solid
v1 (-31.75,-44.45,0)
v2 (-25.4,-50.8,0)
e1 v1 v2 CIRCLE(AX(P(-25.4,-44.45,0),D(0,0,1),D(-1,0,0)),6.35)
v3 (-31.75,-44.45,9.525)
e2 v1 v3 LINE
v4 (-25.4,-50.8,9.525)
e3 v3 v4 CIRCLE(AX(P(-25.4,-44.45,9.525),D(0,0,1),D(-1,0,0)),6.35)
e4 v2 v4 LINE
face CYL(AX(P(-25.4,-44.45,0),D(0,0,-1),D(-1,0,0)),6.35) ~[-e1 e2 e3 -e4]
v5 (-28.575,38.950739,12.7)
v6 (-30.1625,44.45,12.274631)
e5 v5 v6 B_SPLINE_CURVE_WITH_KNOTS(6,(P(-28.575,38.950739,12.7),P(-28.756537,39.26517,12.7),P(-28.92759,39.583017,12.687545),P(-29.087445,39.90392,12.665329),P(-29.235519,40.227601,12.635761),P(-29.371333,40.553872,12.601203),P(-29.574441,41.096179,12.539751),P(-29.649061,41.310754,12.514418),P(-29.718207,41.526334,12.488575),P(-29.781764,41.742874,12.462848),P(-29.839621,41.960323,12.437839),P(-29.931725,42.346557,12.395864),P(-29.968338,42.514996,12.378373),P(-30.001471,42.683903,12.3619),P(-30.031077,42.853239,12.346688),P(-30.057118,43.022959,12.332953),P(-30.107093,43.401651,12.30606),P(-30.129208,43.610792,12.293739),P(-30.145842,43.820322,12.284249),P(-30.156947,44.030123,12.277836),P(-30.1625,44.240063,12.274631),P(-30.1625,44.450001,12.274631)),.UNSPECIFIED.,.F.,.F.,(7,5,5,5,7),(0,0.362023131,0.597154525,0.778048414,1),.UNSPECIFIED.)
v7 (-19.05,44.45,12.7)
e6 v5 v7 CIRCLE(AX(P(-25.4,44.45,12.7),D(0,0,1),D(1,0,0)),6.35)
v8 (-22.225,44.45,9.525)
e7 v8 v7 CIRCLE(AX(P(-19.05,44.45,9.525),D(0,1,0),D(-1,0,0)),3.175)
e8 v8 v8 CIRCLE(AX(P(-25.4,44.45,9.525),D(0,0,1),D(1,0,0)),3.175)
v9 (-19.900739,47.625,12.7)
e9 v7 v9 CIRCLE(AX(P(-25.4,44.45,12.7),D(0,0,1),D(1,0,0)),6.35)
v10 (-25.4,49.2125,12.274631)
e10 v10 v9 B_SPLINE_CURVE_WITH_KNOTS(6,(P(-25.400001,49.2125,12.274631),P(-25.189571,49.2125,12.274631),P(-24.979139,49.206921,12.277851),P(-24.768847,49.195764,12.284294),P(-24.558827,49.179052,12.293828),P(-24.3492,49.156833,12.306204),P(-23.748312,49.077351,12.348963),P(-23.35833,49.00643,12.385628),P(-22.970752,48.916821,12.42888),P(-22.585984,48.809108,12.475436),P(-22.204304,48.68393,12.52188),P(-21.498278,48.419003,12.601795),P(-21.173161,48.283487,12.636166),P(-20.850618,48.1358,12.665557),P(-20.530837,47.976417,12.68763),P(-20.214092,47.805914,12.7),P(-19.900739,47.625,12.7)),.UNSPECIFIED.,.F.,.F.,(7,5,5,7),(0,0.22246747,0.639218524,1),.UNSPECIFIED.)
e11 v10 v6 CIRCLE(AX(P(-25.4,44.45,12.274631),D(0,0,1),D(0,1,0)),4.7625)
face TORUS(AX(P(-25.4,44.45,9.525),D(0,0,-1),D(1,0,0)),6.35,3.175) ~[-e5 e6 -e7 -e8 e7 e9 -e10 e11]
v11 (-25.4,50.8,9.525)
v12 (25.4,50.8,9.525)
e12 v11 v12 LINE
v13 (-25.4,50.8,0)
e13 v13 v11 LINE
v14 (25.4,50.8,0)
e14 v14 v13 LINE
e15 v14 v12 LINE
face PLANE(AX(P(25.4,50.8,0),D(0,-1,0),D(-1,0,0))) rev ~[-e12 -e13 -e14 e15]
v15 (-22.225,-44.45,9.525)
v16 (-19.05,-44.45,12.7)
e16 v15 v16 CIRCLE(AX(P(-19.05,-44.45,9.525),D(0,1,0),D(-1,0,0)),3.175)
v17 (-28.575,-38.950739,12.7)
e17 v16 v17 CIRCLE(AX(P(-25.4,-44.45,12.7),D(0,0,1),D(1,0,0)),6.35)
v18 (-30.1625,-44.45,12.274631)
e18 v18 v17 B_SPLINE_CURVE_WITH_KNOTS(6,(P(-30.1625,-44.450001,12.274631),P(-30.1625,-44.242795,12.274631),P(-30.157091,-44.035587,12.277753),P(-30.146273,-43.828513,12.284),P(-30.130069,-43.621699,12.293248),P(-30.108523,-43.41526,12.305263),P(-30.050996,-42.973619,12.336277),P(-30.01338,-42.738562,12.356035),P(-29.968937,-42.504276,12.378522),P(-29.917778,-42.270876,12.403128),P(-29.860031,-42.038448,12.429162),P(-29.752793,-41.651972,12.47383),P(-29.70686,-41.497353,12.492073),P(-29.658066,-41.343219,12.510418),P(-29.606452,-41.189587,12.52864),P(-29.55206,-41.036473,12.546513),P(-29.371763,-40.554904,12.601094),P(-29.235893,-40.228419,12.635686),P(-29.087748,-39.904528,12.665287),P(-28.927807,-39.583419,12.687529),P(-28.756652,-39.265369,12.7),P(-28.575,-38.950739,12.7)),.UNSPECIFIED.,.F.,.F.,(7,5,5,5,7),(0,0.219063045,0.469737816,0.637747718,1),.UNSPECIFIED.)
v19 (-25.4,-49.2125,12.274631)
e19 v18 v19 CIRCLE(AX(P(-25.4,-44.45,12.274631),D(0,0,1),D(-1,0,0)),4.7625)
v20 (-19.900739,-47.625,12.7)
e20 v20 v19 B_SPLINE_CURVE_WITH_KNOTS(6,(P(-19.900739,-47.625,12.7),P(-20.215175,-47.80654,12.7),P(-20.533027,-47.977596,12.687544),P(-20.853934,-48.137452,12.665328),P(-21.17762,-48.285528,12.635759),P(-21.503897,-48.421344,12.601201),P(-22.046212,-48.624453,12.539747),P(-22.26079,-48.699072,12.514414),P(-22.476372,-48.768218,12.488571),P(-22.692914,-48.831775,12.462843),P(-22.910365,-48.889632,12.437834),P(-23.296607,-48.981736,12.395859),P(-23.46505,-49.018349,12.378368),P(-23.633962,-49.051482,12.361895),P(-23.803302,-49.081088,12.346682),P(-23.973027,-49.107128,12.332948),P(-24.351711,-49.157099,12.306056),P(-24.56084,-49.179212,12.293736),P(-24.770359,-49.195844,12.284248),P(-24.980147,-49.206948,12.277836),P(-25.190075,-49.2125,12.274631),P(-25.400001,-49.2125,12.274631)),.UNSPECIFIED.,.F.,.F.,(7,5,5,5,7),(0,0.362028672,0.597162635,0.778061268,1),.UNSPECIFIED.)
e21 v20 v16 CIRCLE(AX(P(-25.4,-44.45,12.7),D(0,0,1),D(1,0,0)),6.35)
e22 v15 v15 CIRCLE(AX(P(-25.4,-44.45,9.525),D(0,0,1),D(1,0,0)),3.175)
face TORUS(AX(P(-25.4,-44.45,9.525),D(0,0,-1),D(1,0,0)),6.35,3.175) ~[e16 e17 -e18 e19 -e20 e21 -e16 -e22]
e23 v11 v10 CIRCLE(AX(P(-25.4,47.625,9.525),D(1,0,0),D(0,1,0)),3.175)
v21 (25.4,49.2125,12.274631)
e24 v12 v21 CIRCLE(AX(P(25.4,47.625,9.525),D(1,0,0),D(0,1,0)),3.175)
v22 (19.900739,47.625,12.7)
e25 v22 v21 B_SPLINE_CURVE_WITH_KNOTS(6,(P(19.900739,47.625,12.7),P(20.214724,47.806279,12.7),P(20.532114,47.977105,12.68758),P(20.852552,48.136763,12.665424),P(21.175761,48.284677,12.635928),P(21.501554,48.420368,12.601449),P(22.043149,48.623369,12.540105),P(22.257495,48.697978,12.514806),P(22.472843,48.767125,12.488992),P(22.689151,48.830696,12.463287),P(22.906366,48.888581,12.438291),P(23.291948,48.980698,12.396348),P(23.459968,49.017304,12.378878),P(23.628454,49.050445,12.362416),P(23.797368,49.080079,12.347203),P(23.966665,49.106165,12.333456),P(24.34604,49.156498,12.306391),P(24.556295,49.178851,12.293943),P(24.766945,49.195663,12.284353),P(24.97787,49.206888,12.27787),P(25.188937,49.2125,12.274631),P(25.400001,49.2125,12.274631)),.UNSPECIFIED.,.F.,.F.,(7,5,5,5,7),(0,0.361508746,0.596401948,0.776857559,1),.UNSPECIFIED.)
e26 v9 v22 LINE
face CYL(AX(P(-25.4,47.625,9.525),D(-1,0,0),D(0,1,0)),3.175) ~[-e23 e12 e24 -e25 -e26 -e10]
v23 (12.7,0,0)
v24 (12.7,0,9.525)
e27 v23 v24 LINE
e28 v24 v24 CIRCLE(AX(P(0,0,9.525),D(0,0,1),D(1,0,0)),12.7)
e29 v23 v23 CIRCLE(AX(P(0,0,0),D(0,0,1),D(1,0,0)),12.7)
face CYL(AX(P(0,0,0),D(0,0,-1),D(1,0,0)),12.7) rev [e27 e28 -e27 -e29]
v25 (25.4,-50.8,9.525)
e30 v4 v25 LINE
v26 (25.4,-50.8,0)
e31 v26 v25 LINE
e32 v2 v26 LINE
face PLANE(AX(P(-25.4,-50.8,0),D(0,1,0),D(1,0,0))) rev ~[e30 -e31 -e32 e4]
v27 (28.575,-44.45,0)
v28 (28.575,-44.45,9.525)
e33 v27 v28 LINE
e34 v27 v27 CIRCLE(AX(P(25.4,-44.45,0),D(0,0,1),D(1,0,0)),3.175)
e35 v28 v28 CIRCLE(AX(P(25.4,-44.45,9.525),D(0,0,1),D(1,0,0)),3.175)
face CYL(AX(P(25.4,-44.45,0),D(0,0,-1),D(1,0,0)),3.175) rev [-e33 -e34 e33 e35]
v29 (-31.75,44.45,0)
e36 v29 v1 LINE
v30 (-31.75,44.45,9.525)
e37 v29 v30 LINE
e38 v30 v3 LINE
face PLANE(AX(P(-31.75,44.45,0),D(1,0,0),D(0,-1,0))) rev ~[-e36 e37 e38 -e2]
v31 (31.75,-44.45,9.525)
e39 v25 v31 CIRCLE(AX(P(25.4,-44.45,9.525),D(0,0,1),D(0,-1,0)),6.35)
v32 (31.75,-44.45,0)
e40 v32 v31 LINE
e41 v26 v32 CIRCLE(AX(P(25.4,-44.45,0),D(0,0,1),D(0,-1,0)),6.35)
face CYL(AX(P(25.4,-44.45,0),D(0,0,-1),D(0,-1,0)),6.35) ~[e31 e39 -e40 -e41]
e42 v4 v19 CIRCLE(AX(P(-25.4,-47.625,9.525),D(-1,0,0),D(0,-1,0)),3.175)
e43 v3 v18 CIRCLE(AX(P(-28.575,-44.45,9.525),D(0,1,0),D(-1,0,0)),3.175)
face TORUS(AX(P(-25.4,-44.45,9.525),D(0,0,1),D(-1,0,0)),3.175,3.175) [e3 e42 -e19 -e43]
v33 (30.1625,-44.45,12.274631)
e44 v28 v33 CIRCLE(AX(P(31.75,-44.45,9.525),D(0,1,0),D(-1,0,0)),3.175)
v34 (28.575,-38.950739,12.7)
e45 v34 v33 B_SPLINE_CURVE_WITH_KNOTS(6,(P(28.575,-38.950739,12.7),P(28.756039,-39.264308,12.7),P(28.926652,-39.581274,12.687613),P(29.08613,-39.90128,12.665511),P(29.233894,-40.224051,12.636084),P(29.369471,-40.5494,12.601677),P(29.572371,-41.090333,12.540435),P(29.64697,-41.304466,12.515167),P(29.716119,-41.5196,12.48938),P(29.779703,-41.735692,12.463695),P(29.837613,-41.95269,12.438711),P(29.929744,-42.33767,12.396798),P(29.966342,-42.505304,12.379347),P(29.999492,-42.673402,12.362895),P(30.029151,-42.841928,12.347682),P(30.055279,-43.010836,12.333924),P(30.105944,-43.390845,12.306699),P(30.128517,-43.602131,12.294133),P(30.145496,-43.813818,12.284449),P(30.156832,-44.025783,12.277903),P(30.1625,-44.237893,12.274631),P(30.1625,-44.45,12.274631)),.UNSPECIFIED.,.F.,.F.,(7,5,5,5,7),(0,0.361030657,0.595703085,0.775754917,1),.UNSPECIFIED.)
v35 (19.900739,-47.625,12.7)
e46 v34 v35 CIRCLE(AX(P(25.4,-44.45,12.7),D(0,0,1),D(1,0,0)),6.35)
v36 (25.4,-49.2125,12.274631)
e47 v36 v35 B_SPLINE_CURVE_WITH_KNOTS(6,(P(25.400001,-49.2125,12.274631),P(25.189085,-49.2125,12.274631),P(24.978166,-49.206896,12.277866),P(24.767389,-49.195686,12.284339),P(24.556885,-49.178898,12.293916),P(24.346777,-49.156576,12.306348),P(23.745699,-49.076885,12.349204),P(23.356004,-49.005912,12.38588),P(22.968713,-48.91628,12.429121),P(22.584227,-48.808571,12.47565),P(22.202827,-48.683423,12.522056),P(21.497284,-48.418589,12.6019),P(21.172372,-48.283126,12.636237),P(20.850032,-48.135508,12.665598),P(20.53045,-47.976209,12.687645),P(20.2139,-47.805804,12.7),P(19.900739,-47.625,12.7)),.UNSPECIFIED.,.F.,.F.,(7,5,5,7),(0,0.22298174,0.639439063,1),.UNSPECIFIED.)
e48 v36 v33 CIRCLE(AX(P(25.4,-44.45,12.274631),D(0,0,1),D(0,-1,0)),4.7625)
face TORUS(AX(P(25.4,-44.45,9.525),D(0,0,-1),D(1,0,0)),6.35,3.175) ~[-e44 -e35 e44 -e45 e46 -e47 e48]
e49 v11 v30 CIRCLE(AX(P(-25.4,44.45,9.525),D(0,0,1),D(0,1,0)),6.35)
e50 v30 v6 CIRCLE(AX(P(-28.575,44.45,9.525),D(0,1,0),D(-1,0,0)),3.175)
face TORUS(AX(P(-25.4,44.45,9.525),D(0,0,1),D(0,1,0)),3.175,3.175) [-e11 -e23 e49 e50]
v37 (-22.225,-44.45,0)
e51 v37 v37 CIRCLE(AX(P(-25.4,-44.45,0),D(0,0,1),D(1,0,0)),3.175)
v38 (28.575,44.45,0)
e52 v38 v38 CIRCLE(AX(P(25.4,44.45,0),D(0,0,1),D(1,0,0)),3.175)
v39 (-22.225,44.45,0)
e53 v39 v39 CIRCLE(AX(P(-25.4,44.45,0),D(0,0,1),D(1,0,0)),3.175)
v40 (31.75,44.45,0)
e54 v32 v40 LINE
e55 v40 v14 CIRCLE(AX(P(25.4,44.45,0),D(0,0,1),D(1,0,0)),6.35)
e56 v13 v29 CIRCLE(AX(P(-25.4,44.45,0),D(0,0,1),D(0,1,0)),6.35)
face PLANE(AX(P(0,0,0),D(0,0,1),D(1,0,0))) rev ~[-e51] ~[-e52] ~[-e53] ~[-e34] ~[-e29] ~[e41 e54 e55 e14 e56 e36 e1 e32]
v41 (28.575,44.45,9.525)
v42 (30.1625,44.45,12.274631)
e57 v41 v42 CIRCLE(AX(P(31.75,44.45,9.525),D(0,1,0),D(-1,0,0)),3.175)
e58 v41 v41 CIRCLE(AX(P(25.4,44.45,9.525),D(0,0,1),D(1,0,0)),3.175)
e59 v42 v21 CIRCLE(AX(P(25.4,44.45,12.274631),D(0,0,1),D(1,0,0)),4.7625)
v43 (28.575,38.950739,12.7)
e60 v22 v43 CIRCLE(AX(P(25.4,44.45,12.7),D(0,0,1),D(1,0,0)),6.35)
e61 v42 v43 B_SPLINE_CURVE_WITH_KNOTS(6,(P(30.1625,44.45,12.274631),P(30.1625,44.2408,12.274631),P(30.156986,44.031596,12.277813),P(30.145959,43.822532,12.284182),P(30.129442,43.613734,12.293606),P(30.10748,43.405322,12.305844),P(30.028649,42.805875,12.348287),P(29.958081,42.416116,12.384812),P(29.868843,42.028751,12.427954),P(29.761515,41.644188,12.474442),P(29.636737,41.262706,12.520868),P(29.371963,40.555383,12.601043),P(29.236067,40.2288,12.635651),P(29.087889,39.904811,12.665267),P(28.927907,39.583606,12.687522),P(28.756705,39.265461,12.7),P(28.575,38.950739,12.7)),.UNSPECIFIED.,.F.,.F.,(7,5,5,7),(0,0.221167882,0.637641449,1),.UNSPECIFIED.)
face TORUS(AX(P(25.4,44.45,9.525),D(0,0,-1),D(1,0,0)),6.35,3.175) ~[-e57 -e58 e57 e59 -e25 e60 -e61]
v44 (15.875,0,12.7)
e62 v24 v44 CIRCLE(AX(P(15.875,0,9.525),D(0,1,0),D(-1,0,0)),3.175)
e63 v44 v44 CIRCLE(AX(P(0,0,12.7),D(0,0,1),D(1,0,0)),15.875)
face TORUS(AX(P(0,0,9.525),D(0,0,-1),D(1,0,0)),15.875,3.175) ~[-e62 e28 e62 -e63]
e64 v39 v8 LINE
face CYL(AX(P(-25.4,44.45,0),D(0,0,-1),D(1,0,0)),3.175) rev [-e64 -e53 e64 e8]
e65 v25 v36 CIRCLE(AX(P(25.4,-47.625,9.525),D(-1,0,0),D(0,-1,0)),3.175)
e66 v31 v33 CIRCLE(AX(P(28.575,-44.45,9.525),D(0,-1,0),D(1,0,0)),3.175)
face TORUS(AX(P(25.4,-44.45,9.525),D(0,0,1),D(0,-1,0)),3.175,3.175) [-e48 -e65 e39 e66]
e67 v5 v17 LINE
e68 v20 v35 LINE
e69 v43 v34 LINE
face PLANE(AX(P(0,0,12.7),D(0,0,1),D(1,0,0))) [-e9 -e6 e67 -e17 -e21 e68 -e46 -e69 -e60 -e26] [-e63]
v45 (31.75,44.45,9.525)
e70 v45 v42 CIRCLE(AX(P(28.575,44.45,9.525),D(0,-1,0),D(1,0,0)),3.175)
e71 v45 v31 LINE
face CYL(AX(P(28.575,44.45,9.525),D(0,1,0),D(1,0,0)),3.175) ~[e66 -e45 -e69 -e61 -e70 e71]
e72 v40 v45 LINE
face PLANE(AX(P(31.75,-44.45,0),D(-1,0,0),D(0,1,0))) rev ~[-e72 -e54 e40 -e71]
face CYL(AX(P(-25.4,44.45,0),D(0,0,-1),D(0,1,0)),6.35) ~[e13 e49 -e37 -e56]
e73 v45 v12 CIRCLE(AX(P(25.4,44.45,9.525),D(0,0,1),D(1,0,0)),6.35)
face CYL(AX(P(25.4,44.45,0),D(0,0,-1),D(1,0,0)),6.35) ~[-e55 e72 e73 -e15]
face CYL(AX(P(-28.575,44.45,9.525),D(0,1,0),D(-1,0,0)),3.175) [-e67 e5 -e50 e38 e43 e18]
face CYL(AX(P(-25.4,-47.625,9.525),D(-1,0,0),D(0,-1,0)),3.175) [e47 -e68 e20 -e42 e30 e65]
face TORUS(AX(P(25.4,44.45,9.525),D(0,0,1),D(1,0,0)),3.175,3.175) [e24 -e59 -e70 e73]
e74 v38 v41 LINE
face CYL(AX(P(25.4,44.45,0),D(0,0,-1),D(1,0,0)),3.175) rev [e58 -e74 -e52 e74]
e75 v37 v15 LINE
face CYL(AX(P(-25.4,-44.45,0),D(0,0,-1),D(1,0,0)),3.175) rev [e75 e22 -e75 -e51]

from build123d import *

# Parameters (mm, degrees)
F0_R         = 3.175
F0_R_2       = 12.7
F1_DEPTH     = 12.7
F2_T1_DEPTH  = 50.8
F2_T3_DEPTH  = 88.9
F2_T6_ANGLE  = 90
F2_T8_ANGLE  = 90
F2_T10_ANGLE = 90
F2_T12_ANGLE = 90


# Not quite as in the source:
# - a fillet or chamfer that OpenCascade refuses, or shapes differently, is made with other operations: its cross-section is extruded or revolved along the edge and cut away or added


with BuildPart() as f1:
    # F0 (on Top) → F1 (new body)
    with BuildSketch(Plane.XY):
        with BuildLine():
            ThreePointArc((31.75, 44.45), (29.8901280605, 48.9401280605), (25.4, 50.8))
            Line((25.4, 50.8), (-25.4, 50.8))
            ThreePointArc((-25.4, 50.8), (-29.8901280605, 48.9401280605), (-31.75, 44.45))
            Line((-31.75, 44.45), (-31.75, -44.45))
            ThreePointArc((-31.75, -44.45), (-29.8901280605, -48.9401280605), (-25.4, -50.8))
            Line((-25.4, -50.8), (25.4, -50.8))
            ThreePointArc((25.4, -50.8), (29.8901280605, -48.9401280605), (31.75, -44.45))
            Line((31.75, -44.45), (31.75, 44.45))
        make_face()
        with Locations((-25.4, -44.45)):
            Circle(F0_R, mode=Mode.SUBTRACT)
        with Locations((25.4, -44.45)):
            Circle(F0_R, mode=Mode.SUBTRACT)
        Circle(F0_R_2, mode=Mode.SUBTRACT)
        with Locations((-25.4, 44.45)):
            Circle(F0_R, mode=Mode.SUBTRACT)
        with Locations((25.4, 44.45)):
            Circle(F0_R, mode=Mode.SUBTRACT)
    extrude(amount=F1_DEPTH)

    # F2: fillet of radius 3.175 on 13 edges, made by hand

    # F2_s2 → F2_t1 (cut)
    with BuildSketch(Plane.YZ.offset(-25.4)):
        with BuildLine():
            ThreePointArc((50.8, 9.525), (49.8700640303, 11.7700640303), (47.625, 12.7))
            Line((47.625, 12.7), (50.8, 12.7))
            Line((50.8, 12.7), (50.8, 9.525))
        make_face()
        with BuildLine():
            ThreePointArc((-50.8, 9.525), (-49.8700640303, 11.7700640303), (-47.625, 12.7))
            Line((-47.625, 12.7), (-50.8, 12.7))
            Line((-50.8, 12.7), (-50.8, 9.525))
        make_face()
    extrude(amount=F2_T1_DEPTH, mode=Mode.SUBTRACT)

    # F2_s4 → F2_t3 (cut)
    with BuildSketch(Plane.XZ.offset(-44.45)):
        with BuildLine():
            ThreePointArc((-31.75, 9.525), (-30.8200640303, 11.7700640303), (-28.575, 12.7))
            Line((-28.575, 12.7), (-31.75, 12.7))
            Line((-31.75, 12.7), (-31.75, 9.525))
        make_face()
        with BuildLine():
            ThreePointArc((31.75, 9.525), (30.8200640303, 11.7700640303), (28.575, 12.7))
            Line((28.575, 12.7), (31.75, 12.7))
            Line((31.75, 12.7), (31.75, 9.525))
        make_face()
    extrude(amount=F2_T3_DEPTH, mode=Mode.SUBTRACT)

    # F2_s5 → F2_t6 (revolve, cut)
    with BuildSketch(Plane.XZ.offset(-44.45)):
        with BuildLine():
            ThreePointArc((31.75, 9.525), (30.8200640303, 11.7700640303), (28.575, 12.7))
            Line((28.575, 12.7), (31.75, 12.7))
            Line((31.75, 12.7), (31.75, 9.525))
        make_face()
    revolve(axis=Axis((25.4, 44.45, 12.7), (0, 0, 1)), revolution_arc=F2_T6_ANGLE, mode=Mode.SUBTRACT)

    # F2_s7 → F2_t8 (revolve, cut)
    with BuildSketch(Plane.YZ.offset(-25.4)):
        with BuildLine():
            ThreePointArc((50.8, 9.525), (49.8700640303, 11.7700640303), (47.625, 12.7))
            Line((47.625, 12.7), (50.8, 12.7))
            Line((50.8, 12.7), (50.8, 9.525))
        make_face()
    revolve(axis=Axis((-25.4, 44.45, 12.7), (0, 0, 1)), revolution_arc=F2_T8_ANGLE, mode=Mode.SUBTRACT)

    # F2_s9 → F2_t10 (revolve, cut)
    with BuildSketch(Plane.XZ.offset(44.45)):
        with BuildLine():
            ThreePointArc((-31.75, 9.525), (-30.8200640303, 11.7700640303), (-28.575, 12.7))
            Line((-28.575, 12.7), (-31.75, 12.7))
            Line((-31.75, 12.7), (-31.75, 9.525))
        make_face()
    revolve(axis=Axis((-25.4, -44.45, 12.7), (0, 0, 1)), revolution_arc=F2_T10_ANGLE, mode=Mode.SUBTRACT)

    # F2_s11 → F2_t12 (revolve, cut)
    with BuildSketch(Plane.YZ.offset(25.4)):
        with BuildLine():
            ThreePointArc((-50.8, 9.525), (-49.8700640303, 11.7700640303), (-47.625, 12.7))
            Line((-47.625, 12.7), (-50.8, 12.7))
            Line((-50.8, 12.7), (-50.8, 9.525))
        make_face()
    revolve(axis=Axis((25.4, -44.45, 12.7), (0, 0, 1)), revolution_arc=F2_T12_ANGLE, mode=Mode.SUBTRACT)

    # F2_s13 → F2_t14 (revolve, cut)
    with BuildSketch(Plane.XZ.offset(44.45)):
        with BuildLine():
            ThreePointArc((-22.225, 9.525), (-21.2950640303, 11.7700640303), (-19.05, 12.7))
            Line((-19.05, 12.7), (-22.225, 12.7))
            Line((-22.225, 12.7), (-22.225, 9.525))
        make_face()
    revolve(axis=Axis((-25.4, -44.45, 12.7), (0, 0, 1)), mode=Mode.SUBTRACT)

    # F2_s15 → F2_t16 (revolve, cut)
    with BuildSketch(Plane.XZ.offset(44.45)):
        with BuildLine():
            ThreePointArc((28.575, 9.525), (29.5049359697, 11.7700640303), (31.75, 12.7))
            Line((31.75, 12.7), (28.575, 12.7))
            Line((28.575, 12.7), (28.575, 9.525))
        make_face()
    revolve(axis=Axis((25.4, -44.45, 12.7), (0, 0, 1)), mode=Mode.SUBTRACT)

    # F2_s17 → F2_t18 (revolve, cut)
    with BuildSketch(Plane.XZ):
        with BuildLine():
            ThreePointArc((12.7, 9.525), (13.6299359697, 11.7700640303), (15.875, 12.7))
            Line((15.875, 12.7), (12.7, 12.7))
            Line((12.7, 12.7), (12.7, 9.525))
        make_face()
    revolve(axis=Axis((0, 0, 12.7), (0, 0, 1)), mode=Mode.SUBTRACT)

    # F2_s19 → F2_t20 (revolve, cut)
    with BuildSketch(Plane.XZ.offset(-44.45)):
        with BuildLine():
            ThreePointArc((-22.225, 9.525), (-21.2950640303, 11.7700640303), (-19.05, 12.7))
            Line((-19.05, 12.7), (-22.225, 12.7))
            Line((-22.225, 12.7), (-22.225, 9.525))
        make_face()
    revolve(axis=Axis((-25.4, 44.45, 12.7), (0, 0, 1)), mode=Mode.SUBTRACT)

    # F2_s21 → F2_t22 (revolve, cut)
    with BuildSketch(Plane.XZ.offset(-44.45)):
        with BuildLine():
            ThreePointArc((28.575, 9.525), (29.5049359697, 11.7700640303), (31.75, 12.7))
            Line((31.75, 12.7), (28.575, 12.7))
            Line((28.575, 12.7), (28.575, 9.525))
        make_face()
    revolve(axis=Axis((25.4, 44.45, 12.7), (0, 0, 1)), mode=Mode.SUBTRACT)


solid = f1.part
